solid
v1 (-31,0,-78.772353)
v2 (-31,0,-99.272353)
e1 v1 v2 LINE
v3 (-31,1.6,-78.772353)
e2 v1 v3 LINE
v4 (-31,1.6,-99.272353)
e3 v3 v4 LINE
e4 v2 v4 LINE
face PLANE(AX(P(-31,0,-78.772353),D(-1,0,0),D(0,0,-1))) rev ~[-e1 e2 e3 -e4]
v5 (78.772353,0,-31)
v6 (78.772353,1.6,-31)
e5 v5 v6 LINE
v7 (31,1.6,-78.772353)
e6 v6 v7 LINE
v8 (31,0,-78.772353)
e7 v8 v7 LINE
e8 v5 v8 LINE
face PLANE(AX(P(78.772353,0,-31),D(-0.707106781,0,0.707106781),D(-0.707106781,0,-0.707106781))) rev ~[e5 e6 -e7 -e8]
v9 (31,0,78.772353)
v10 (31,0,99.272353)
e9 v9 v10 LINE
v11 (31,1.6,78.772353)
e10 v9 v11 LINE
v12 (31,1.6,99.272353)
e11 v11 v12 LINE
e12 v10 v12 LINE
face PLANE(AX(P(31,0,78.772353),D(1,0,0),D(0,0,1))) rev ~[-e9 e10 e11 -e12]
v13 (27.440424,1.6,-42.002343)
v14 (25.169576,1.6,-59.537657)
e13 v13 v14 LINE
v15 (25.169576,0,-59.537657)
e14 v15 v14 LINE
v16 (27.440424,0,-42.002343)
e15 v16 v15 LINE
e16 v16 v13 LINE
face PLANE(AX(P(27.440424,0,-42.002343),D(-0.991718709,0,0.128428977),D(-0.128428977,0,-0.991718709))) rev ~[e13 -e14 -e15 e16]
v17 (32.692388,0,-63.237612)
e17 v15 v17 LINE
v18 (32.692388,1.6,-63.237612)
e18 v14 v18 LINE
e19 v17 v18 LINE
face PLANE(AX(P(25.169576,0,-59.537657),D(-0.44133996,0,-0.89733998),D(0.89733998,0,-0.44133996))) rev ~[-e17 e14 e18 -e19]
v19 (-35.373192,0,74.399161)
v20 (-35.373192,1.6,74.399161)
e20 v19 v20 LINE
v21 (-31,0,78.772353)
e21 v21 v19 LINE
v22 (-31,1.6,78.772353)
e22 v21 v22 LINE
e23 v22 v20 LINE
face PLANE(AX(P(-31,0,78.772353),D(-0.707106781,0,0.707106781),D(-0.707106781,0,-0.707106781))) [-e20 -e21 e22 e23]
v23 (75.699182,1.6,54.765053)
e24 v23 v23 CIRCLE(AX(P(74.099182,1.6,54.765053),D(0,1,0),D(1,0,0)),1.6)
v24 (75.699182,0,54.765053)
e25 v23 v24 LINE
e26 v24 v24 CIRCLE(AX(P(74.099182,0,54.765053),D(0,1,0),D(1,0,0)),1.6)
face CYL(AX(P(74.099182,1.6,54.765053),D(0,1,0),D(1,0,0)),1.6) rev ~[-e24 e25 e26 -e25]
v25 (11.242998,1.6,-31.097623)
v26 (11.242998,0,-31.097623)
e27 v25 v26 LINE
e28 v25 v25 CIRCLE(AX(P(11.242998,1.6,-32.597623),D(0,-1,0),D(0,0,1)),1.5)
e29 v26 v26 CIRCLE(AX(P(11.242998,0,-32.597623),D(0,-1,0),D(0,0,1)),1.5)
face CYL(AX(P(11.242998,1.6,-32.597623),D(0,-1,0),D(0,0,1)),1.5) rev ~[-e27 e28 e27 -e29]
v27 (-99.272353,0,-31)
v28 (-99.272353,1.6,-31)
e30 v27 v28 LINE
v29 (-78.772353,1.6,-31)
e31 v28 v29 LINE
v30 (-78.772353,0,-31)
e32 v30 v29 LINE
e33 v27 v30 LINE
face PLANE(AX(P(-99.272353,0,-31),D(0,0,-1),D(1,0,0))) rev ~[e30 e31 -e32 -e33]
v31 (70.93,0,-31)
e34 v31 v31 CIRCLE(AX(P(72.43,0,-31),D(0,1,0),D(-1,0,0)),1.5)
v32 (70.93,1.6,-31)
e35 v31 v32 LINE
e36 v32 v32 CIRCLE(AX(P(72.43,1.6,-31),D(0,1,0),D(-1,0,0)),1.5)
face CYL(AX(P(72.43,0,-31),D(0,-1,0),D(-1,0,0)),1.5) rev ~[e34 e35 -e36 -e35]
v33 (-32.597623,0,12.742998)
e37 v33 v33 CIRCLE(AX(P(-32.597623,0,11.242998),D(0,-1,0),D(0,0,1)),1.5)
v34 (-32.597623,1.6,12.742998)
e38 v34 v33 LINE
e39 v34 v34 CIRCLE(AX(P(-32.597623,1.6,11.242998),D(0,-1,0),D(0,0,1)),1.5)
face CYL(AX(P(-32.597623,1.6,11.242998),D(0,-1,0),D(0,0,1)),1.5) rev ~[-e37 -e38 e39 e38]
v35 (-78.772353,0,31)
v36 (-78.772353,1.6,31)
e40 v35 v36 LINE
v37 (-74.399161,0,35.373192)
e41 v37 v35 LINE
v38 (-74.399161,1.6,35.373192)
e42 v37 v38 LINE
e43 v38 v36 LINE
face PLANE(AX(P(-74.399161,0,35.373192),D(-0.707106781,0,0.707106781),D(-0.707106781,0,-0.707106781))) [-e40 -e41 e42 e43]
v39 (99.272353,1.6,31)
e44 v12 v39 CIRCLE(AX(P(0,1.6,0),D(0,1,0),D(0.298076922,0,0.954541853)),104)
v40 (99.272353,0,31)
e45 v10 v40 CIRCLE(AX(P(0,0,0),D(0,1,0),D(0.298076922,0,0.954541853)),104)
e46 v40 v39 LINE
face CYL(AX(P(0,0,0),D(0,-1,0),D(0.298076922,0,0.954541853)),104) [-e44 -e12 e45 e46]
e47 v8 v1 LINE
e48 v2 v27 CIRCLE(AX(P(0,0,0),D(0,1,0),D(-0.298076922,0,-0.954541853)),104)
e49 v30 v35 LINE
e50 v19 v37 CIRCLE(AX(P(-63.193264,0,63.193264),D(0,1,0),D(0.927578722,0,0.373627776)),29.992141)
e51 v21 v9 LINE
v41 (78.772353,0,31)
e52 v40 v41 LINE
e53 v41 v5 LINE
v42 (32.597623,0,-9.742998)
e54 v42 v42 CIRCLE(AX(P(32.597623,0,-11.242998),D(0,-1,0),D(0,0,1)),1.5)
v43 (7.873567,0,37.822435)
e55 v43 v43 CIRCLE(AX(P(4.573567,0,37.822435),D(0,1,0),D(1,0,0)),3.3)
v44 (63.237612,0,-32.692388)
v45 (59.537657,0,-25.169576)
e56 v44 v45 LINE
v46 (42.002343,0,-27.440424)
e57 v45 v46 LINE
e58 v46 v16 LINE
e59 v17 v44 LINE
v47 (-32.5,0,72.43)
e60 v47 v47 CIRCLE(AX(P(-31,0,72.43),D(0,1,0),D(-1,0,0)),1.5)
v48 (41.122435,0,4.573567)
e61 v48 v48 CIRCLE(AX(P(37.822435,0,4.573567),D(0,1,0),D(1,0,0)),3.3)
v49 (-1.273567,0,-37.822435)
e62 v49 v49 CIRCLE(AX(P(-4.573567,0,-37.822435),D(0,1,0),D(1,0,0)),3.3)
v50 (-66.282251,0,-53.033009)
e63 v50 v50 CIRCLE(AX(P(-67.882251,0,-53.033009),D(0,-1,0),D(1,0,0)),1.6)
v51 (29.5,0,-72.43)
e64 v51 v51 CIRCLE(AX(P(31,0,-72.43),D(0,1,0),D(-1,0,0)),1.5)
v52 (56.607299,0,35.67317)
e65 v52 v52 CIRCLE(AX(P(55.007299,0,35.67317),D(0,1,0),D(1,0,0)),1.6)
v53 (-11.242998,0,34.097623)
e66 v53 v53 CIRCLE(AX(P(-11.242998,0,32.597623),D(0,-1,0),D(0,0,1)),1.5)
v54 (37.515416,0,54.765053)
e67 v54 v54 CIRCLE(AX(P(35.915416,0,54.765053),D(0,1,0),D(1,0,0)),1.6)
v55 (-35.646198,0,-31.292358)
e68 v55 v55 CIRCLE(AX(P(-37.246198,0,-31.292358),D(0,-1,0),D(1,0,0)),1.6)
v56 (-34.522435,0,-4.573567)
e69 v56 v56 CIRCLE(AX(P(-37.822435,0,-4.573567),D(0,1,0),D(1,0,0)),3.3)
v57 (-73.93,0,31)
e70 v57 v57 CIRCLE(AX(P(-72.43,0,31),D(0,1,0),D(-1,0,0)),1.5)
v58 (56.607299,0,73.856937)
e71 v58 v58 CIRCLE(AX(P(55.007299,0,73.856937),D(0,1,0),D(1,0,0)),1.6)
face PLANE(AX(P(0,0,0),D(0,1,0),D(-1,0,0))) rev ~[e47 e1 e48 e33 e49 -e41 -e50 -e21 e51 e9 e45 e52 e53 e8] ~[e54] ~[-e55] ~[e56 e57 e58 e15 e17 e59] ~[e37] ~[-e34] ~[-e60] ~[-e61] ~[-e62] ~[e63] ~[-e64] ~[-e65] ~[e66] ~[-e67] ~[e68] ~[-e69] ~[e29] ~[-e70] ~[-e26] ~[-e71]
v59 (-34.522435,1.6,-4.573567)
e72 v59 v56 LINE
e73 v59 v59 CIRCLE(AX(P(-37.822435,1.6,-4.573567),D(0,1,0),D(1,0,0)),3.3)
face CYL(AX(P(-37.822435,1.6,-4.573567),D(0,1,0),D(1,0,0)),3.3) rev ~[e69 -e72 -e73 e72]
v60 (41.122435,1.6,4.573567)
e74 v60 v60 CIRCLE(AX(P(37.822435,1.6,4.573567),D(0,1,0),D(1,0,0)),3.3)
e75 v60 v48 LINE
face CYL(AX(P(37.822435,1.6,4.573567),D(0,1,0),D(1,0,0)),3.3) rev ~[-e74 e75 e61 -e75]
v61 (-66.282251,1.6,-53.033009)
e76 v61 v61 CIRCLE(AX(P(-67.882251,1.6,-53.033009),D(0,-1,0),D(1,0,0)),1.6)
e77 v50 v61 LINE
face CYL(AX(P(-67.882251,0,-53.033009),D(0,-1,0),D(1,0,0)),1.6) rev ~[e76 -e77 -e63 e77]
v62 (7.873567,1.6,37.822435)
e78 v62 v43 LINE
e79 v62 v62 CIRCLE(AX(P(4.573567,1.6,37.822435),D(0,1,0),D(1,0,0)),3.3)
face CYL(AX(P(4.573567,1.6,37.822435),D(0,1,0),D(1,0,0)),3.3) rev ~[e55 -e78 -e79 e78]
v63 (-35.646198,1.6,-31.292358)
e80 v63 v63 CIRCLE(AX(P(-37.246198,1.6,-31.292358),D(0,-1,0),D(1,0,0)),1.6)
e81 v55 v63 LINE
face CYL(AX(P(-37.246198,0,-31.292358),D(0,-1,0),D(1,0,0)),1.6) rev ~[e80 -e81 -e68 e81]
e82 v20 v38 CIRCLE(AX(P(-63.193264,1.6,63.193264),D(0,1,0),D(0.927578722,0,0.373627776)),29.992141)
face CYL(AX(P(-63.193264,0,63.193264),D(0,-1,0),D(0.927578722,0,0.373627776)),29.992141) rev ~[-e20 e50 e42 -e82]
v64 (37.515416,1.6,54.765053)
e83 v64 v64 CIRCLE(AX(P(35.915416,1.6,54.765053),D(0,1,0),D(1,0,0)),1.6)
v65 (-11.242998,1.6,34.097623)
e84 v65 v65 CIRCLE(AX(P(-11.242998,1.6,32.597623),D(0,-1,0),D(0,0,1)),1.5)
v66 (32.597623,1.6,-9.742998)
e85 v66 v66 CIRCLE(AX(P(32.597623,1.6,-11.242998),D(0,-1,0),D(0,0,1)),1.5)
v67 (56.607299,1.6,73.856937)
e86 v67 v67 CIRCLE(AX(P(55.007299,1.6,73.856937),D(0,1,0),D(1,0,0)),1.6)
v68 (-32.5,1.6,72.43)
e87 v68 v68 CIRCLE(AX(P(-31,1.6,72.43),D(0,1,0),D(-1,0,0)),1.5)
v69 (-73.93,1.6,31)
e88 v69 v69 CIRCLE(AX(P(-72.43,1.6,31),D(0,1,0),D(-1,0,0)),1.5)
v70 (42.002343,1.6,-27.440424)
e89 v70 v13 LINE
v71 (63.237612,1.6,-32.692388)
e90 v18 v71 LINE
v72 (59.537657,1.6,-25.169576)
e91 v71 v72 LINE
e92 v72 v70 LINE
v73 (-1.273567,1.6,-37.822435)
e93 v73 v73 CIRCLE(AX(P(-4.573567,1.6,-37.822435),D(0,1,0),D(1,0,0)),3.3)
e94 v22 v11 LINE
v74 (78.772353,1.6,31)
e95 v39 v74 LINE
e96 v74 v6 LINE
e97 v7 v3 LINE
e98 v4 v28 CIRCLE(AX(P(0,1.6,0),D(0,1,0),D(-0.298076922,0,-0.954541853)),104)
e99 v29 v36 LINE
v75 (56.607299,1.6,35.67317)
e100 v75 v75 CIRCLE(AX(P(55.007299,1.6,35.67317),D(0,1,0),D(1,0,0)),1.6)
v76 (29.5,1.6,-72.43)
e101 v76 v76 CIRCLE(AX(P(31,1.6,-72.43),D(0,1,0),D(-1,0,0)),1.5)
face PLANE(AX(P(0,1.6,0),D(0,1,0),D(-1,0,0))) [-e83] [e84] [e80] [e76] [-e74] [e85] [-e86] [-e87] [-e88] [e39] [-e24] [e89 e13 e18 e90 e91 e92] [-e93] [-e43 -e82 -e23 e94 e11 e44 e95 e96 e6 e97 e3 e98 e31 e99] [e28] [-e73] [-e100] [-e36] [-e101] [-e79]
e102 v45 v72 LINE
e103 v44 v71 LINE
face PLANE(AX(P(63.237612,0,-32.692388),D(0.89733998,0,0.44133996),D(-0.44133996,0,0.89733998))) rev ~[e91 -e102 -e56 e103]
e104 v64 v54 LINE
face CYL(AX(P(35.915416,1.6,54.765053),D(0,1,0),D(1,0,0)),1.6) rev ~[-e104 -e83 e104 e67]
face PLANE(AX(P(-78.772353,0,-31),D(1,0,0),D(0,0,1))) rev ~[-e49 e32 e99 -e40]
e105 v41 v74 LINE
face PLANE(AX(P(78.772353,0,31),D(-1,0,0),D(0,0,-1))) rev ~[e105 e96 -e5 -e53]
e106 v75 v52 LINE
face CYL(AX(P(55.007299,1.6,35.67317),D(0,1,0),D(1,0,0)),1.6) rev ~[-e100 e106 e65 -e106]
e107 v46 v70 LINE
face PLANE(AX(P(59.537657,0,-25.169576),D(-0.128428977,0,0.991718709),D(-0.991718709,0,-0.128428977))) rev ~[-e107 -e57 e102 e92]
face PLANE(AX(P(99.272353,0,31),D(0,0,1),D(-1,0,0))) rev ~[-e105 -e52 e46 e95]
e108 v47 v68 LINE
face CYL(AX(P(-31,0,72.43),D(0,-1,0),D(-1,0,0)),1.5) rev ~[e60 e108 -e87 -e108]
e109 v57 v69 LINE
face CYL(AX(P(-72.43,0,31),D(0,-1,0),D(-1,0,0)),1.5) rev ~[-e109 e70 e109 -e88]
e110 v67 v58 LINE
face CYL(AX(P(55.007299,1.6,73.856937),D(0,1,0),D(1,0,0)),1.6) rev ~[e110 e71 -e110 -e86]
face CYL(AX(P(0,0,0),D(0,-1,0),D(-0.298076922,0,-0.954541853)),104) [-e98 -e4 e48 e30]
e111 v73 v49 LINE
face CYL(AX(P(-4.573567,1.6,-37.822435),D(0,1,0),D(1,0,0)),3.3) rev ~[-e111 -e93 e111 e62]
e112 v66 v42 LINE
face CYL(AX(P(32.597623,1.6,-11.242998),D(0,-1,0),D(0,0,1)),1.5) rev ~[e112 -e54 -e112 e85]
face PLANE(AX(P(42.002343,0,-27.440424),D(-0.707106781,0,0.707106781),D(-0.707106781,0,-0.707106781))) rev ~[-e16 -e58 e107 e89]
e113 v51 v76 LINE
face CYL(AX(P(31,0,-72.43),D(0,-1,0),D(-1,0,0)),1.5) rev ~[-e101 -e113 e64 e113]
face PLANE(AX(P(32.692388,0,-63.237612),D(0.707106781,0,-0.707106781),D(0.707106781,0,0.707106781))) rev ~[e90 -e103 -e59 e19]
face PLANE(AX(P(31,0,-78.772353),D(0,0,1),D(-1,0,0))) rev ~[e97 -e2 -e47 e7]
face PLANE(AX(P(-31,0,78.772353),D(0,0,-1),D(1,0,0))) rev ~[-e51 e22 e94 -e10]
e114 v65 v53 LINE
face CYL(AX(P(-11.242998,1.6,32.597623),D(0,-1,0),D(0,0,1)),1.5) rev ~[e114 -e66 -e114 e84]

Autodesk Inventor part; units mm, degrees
ref_plane "YZ Plane" through (0, 0, 0) normal (1, 0, 0) x (0, 1, 0)
ref_plane "XZ Plane" through (0, 0, 0) normal (0, 1, 0) x (-1, 0, 0)
ref_plane "XY Plane" through (0, 0, 0) normal (0, 0, 1) x (1, 0, 0)
sketch "Эскиз1" plane through (0, 0, 0) normal (0, 1, 0) x (-1, 0, 0)
  line L0 (-42.002343, -27.440424) -> (-27.440424, -42.002343)
  line L1 (-27.440424, -42.002343) -> (-25.169576, -59.537657)
  line L2 (-25.169576, -59.537657) -> (-32.692388, -63.237612)
  line L3 (-32.692388, -63.237612) -> (-63.237612, -32.692388)
  line L4 (-63.237612, -32.692388) -> (-59.537657, -25.169576)
  line L5 (-59.537657, -25.169576) -> (-42.002343, -27.440424)
  circle A0 centre (-72.43, 16) radius 3.3 construction
  circle A1 centre (44.87, -82.901522) radius 3.3 construction
  circle A2 centre (42.22, 16) radius 3.3
  circle A3 centre (-44.87, 82.901522) radius 3.3 construction
  circle A4 centre (-42.22, 16) radius 3.3 construction
  circle A5 centre (-82.901522, 44.87) radius 3.3 construction
  circle A6 centre (-16, 42.22) radius 3.3 construction
  circle A7 centre (72.43, -16) radius 3.3 construction
  circle A8 centre (16, -72.43) radius 3.3 construction
  circle A9 centre (-16, -72.43) radius 3.3 construction
  circle A10 centre (-42.22, -16) radius 3.3 construction
  circle A11 centre (16, -42.22) radius 3.3 construction
  circle A12 centre (16, 42.22) radius 3.3
  circle A13 centre (16, 72.43) radius 3.3 construction
  circle A14 centre (42.22, -16) radius 3.3 construction
  circle A15 centre (72.43, 16) radius 3.3 construction
  circle A16 centre (-16, 72.43) radius 3.3 construction
  circle A17 centre (82.901522, -44.87) radius 3.3 construction
  circle A18 centre (-16, -42.22) radius 3.3 construction
  circle A19 centre (-72.43, -16) radius 3.3 construction
  line L6 (31, 78.772353) -> (-31, 78.772353)
  line L7 (-31, 78.772353) -> (-31, 99.272353)
  arc A20 (-31, 99.272353) -> (-99.272353, 31) centre (0, 0) ccw
  line L8 (-99.272353, 31) -> (-78.772353, 31)
  line L9 (-78.772353, 31) -> (-78.772353, -31)
  line L10 (-78.772353, -31) -> (-99.272353, -31)
  arc A21 (-99.272353, -31) -> (-98.086264, -34.57) centre (0, 0) ccw
  arc A22 (-34.57, -98.086264) -> (-98.086264, -34.57) centre (-109.02125, -109.02125) ccw
  arc A23 (-34.57, -98.086264) -> (-31, -99.272353) centre (0, 0) ccw
  line L11 (-31, -99.272353) -> (-31, -78.772353)
  line L12 (-31, -78.772353) -> (31, -78.772353)
  line L13 (31, -78.772353) -> (31, -99.272353)
  arc A24 (31, -99.272353) -> (99.272353, -31) centre (0, 0) ccw
  line L14 (99.272353, -31) -> (78.772353, -31)
  line L15 (78.772353, -31) -> (78.772353, 31)
  line L16 (78.772353, 31) -> (99.272353, 31)
  arc A25 (99.272353, 31) -> (98.086264, 34.57) centre (0, 0) ccw
  arc A26 (34.57, 98.086264) -> (98.086264, 34.57) centre (109.02125, 109.02125) ccw
  arc A27 (34.57, 98.086264) -> (31, 99.272353) centre (0, 0) ccw
  line L17 (31, 99.272353) -> (31, 78.772353)
  circle A28 centre (31, 72.43) radius 1.5
  circle A29 centre (72.43, 31) radius 1.5
  circle A30 centre (0, 0) radius 20
  circle A31 centre (-72.43, -31) radius 1.5
  circle A32 centre (-31, -72.43) radius 1.5
  line L18 (-55.861436, 32.526912) -> (-79.195959, 55.861436)
  line L19 (-79.195959, 55.861436) -> (-55.861436, 79.195959)
  line L20 (-55.861436, 79.195959) -> (-32.526912, 55.861436)
  line L21 (-32.526912, 55.861436) -> (-55.861436, 32.526912)
  line L22 (48.313848, -22.45283) -> (80.459207, -54.598189)
  line L23 (80.459207, -54.598189) -> (54.598189, -80.459207)
  line L24 (54.598189, -80.459207) -> (22.45283, -48.313848)
  line L25 (22.45283, -48.313848) -> (48.313848, -22.45283)
  line L26 (31, 78.772353) -> (78.772353, 31)
  circle A33 centre (31, 72.43) radius 3.5 construction
  circle A34 centre (72.43, 31) radius 1.5 construction
  circle A35 centre (72.43, 31) radius 3.5 construction
  arc A36 (35.373192, 74.399161) -> (74.399161, 35.373192) centre (63.193264, 63.193264) ccw
  line L27 (-47.729708, -10.253048) -> (10.253048, 47.729708)
  line L28 (10.253048, 47.729708) -> (47.729708, 10.253048)
  line L29 (47.729708, 10.253048) -> (-10.253048, -47.729708)
  line L30 (-10.253048, -47.729708) -> (-47.729708, -10.253048)
  line L31 (-32.526912, 55.861436) -> (-55.861436, 32.526912) construction
  line L32 (-47.729708, -10.253048) -> (47.729708, 10.253048) construction
  line L33 (-78.772353, -31) -> (-31, -78.772353)
  dimension "d0" = 7
  dimension "d1" = 7
  dimension "d2" = 82
  dimension "d3" = 53
extrude "Выдавливание1" add sketch "Эскиз1" along normal blind 1.6 contours A2 L28 | L28 A12 | L26 A36 L15 L14 A24 L13 L12 L33 L9 L8 A20 L7 L6 | L18 L19 L20 L21 | L22 L23 L24 L25 picked at (43.146155, 15.474263) picked at (17.150343, 42.083412)
sketch "Эскиз2" plane through (0, 0, 0) normal (0, 1, 0) x (1, 0, 0)
  circle A0 centre (26.769578, -48.318655) radius 1.397
  circle A1 centre (47.603772, -27.484461) radius 1.397
  line L0 (47.603772, -27.484461) -> (26.769578, -48.318655) construction
  line L1 (22.45283, -48.313848) -> (24.613608, -50.474625) construction
  line L2 (26.769578, -48.318655) -> (24.613608, -50.474625) construction
  line L3 (-47.729708, -10.253048) -> (10.253048, 47.729708)
  line L4 (47.729708, 10.253048) -> (-10.253048, -47.729708)
  point P0 (-22.45283, 48.313848)
  point P1 (-79.195959, 55.861436)
  point P2 (79.195959, -55.861436)
  dimension "d6" = 3.0558
  dimension "d8" = 29.464
  dimension "d9" = 2.794
sketch "Эскиз4" plane through (0, 1.6, 0) normal (0, 1, 0) x (1, 0, 0)
  arc A0 (75.513396, -56.886374) -> (75.513396, -52.643733) centre (73.392076, -54.765053) ccw
  line L0 (75.513396, -52.643733) -> (57.12862, -34.258957)
  arc A1 (57.12862, -34.258957) -> (52.885979, -34.258957) centre (55.007299, -36.380277) ccw
  line L1 (52.885979, -34.258957) -> (34.501203, -52.643733)
  arc A2 (34.501203, -52.643733) -> (34.501203, -56.886374) centre (36.622523, -54.765053) ccw
  line L2 (34.501203, -56.886374) -> (52.885979, -75.27115)
  arc A3 (52.885979, -75.27115) -> (57.12862, -75.27115) centre (55.007299, -73.14983) ccw
  line L3 (57.12862, -75.27115) -> (75.513396, -56.886374)
  circle A4 centre (62.785474, -48.754646) radius 0.5
  circle A5 centre (55.007299, -73.856937) radius 1.6
  circle A6 centre (74.099182, -54.765053) radius 1.6
  circle A7 centre (55.007299, -35.67317) radius 1.6
  circle A8 centre (61.017707, -39.915811) radius 0.5
  circle A9 centre (55.714406, -41.683578) radius 0.5
  circle A10 centre (57.482173, -43.451345) radius 0.5
  circle A11 centre (59.24994, -45.219112) radius 0.5
  circle A12 centre (61.017707, -46.986879) radius 0.5
  circle A13 centre (43.693591, -64.310995) radius 0.5
  circle A14 centre (41.925824, -62.543228) radius 0.5
  circle A15 centre (62.785474, -41.683578) radius 0.5
  circle A16 centre (59.24994, -38.148044) radius 0.5
  circle A17 centre (53.946639, -39.915811) radius 0.5
  circle A18 centre (35.915416, -54.765053) radius 1.6
  circle A19 centre (40.158057, -60.775461) radius 0.5
  circle A20 centre (38.39029, -59.007694) radius 0.5
  circle A21 centre (64.553241, -50.522413) radius 0.5
  circle A22 centre (66.321008, -45.219112) radius 0.5
  circle A23 centre (64.553241, -43.451345) radius 0.5
  circle A24 centre (68.088775, -46.986879) radius 0.5
  circle A25 centre (69.856542, -48.754646) radius 0.5
  circle A26 centre (71.624309, -50.522413) radius 0.5
  line L4 (47.729708, 10.253048) -> (-10.253048, -47.729708)
  line L5 (18.73833, -18.73833) -> (73.539105, -73.539105) construction
  arc A27 (31, -99.272353) -> (99.272353, -31) centre (0, 0) ccw
  line L6 (-31, -78.772353) -> (31, -78.772353)
  line L7 (78.772353, -31) -> (31, -78.772353) construction
  point P0 (55.007299, -54.765053)
  point P1 (54.886176, -54.886176)
extrude "Выдавливание4" cut sketch "Эскиз4" against normal through all contours A5 | A6 | A7 | A18
sketch "Эскиз5" plane through (0, 0, 0) normal (0, -1, 0) x (1, 0, 0)
  circle A0 centre (-37.246198, -31.292358) radius 1.6
  circle A1 centre (-67.882251, -53.033009) radius 1.6
  arc A2 (99.272353, 31) -> (31, 99.272353) centre (0, 0) ccw
extrude "Выдавливание5" cut sketch "Эскиз5" against normal through all
sketch "Эскиз6" plane through (0, 1.6, 0) normal (0, 1, 0) x (1, 0, 0)
  circle A0 centre (49.151483, 117.512898) radius 1.65
  circle A1 centre (49.151483, 117.512898) radius 3.35
  circle A2 centre (3.90139, 156.848367) radius 1.65
  circle A3 centre (79.999989, 152.999936) radius 1.65
  circle A4 centre (34.74993, 192.33537) radius 1.65
  circle A5 centre (41.950689, 154.924131) radius 41.494038
  line L0 (45.976694, 118.582111) -> (51.702547, 119.684205)
  arc A6 (39.303109, 113.514645) -> (45.976694, 118.582111) centre (26.737362, 136.991182) ccw
  arc A7 (51.702547, 119.684205) -> (59.780333, 117.456035) centre (62.733836, 143.919668) ccw
  arc A8 (78.499345, 155.995027) -> (82.588741, 163.308869) centre (57.591924, 172.485191) ccw
  circle A9 centre (79.999989, 152.999936) radius 3.35
  arc A10 (81.535526, 142.482434) -> (78.204844, 150.171517) centre (55.740492, 135.874711) ccw
  arc A11 (5.402031, 153.853275) -> (1.312636, 146.539393) centre (26.309482, 137.363149) ccw
  circle A12 centre (3.90139, 156.848367) radius 3.35
  arc A13 (2.365865, 167.365871) -> (5.696538, 159.676785) centre (28.160906, 173.973566) ccw
  arc A14 (32.198864, 190.164066) -> (24.121078, 192.392253) centre (21.16753, 165.928649) ccw
  circle A15 centre (34.74993, 192.33537) radius 3.35
  arc A16 (44.598268, 196.333616) -> (37.924718, 191.266155) centre (57.164078, 172.857113) ccw
  line L1 (39.303109, 113.514645) -> (59.780333, 117.456035) construction
  line L2 (-47.022601, -10.253048) -> (10.253048, 47.022601) construction
  line L3 (2.365865, 167.365871) -> (59.780333, 117.456035) construction
  line L4 (24.121036, 192.392233) -> (81.535512, 142.48239) construction
  line L5 (1.312636, 146.539393) -> (44.598268, 196.333616) construction
  line L6 (82.588741, 163.308869) -> (39.303109, 113.514645) construction
  circle A17 centre (41.950689, 154.924131) radius 38.097924 construction
  line L7 (45.976694, 118.582111) -> (46.911064, 113.727652) construction
  line L8 (78.204844, 150.171517) -> (78.499345, 155.995027) construction
  line L9 (41.950689, 154.924131) -> (79.999989, 152.999936) construction
  line L10 (41.950689, 154.924131) -> (34.74993, 192.33537) construction
  line L11 (41.950689, 154.924131) -> (3.90139, 156.848367) construction
  line L12 (5.696538, 159.676785) -> (5.402031, 153.853275) construction
  line L13 (32.198864, 190.164066) -> (37.924718, 191.266155) construction
  line L14 (41.950689, 154.924131) -> (49.151483, 117.512898) construction
  circle A18 centre (-37.822435, 4.573567) radius 3.3
  circle A19 centre (-4.573567, 37.822435) radius 3.3
  circle A20 centre (4.573567, -37.822435) radius 3.3
  circle A21 centre (37.822435, -4.573567) radius 3.3
  circle A22 centre (16, -49.72) radius 3.3
  line L15 (-37.822435, 4.573567) -> (-4.573567, 37.822435) construction
  line L16 (4.573567, -37.822435) -> (37.822435, -4.573567) construction
  line L17 (-21.198001, 21.198001) -> (21.198001, -21.198001) construction
  line L18 (-4.573567, 37.822435) -> (37.822435, -4.573567) construction
  point P0 (-47.616756, 71.930474)
  point P1 (-60.382397, 55.652797)
  point P2 (-60.382397, 22.39343)
  point P3 (-47.616756, 6.115753)
  point P4 (2.783098, 6.115753)
  point P5 (15.548739, 22.39343)
  point P6 (15.244077, 55.858669)
  point P7 (2.910415, 71.585522)
  point P8 (0, 0)
  point P9 (-47.616756, 71.930474)
  point P10 (-60.382397, 55.652797)
  point P11 (-60.382397, 22.39343)
  point P12 (-47.616756, 6.115753)
  point P13 (2.783098, 6.115753)
  point P14 (15.548739, 22.39343)
  point P15 (15.244077, 55.858669)
  point P16 (2.910415, 71.585522)
  point P17 (0, 0)
  dimension "d45" = 82.98808
  dimension "d43" = 3.3
  dimension "d44" = 6.7
  dimension "d46" = 26.62791
  dimension "d47" = 20.47722
  dimension "d48" = 3.71477
  dimension "d49" = 33.16031
  dimension "d50" = 50.33796
  dimension "d51" = 16.58016
  dimension "d52" = 25.16898
  dimension "d53" = 10.42652
  dimension "d54" = 10.42652
  dimension "d55" = 10.42652
  dimension "d56" = 10.42652
  dimension "d57" = 10.42652
  dimension "d58" = 10.42652
  dimension "d59" = 59.957
  dimension "d60" = 47.021
extrude "Выдавливание6" cut sketch "Эскиз6" against normal blind 10 contours A18 | A19 | A20 | A21
sketch "Эскиз7" plane through (0, 1.6, 0) normal (0, 1, 0) x (1, 0, 0)
  line L0 (-38.254477, -11.950105) -> (-11.950105, -38.254477)
  line L1 (-11.950105, -38.254477) -> (38.254477, 11.950105)
  line L2 (38.254477, 11.950105) -> (11.950105, 38.254477)
  line L3 (11.950105, 38.254477) -> (-38.254477, -11.950105)
  line L4 (-38.254477, -11.950105) -> (38.254477, 11.950105) construction
  line L5 (-11.950105, -38.254477) -> (11.950105, 38.254477) construction
  line L6 (47.022601, 10.253048) -> (-10.253048, -47.022601) construction
  line L7 (-47.729708, -10.253048) -> (10.253048, 47.729708)
  line L8 (-10.253048, -47.729708) -> (-47.729708, -10.253048)
  line L9 (10.253048, 47.729708) -> (47.729708, 10.253048)
  line L10 (47.729708, 10.253048) -> (-10.253048, -47.729708)
  line L11 (-38.254477, -11.950105) -> (-11.950105, -38.254477)
  line L12 (-11.950105, -38.254477) -> (38.254477, 11.950105)
  line L13 (38.254477, 11.950105) -> (11.950105, 38.254477)
  line L14 (11.950105, 38.254477) -> (-38.254477, -11.950105)
  line L15 (-38.254477, -11.950105) -> (38.254477, 11.950105) construction
  line L16 (-11.950105, -38.254477) -> (11.950105, 38.254477) construction
  line L17 (47.022601, 10.253048) -> (-10.253048, -47.022601) construction
  line L18 (37.54737, 11.950105) -> (11.950105, 37.54737)
  line L19 (11.950105, 37.54737) -> (-37.54737, -11.950105)
  line L20 (-37.54737, -11.950105) -> (-11.950105, -37.54737)
  line L21 (-11.950105, -37.54737) -> (37.54737, 11.950105)
  line L22 (37.54737, 11.950105) -> (-37.54737, -11.950105) construction
  line L23 (32.597623, 11.242998) -> (-11.242998, -32.597623)
  line L24 (0, 0) -> (31.732181, -31.732181) construction
  circle A0 centre (32.597623, 11.242998) radius 1.5
  line L25 (0, 0) -> (31.732181, 31.732181) construction
  line L26 (0, 0) -> (-9.9, 29) construction
  circle A1 centre (11.242998, 32.597623) radius 1.5
  circle A2 centre (-11.242998, -32.597623) radius 1.5
  circle A3 centre (-32.597623, -11.242998) radius 1.5
  point P0 (0, 0)
  point P1 (0, 0)
  point P2 (10.677312, -10.677312)
  point P3 (-4.979708, 4.979708)
  point P4 (0, 0)
  dimension "d63" = 37.2
  dimension "d64" = 71
  dimension "d67" = 37.2
  dimension "d68" = 71
  dimension "d69" = 36.2
  dimension "d70" = 70
  dimension "d71" = 4
  dimension "d72" = 3
  dimension "d73" = 3
  dimension "d74" = 3
  dimension "d75" = 4
extrude "Выдавливание8" add sketch "Эскиз7" against normal up to surface (1.6 mm away) contours L3 L2 L1 L0 | L7 L9 L10 L8 | L21 L20 L19 L18 | A0 | A1 | A2 | A3
hole "Отверстие1" at (-32.597623, 1.6, 11.242998) at (11.242998, 1.6, -32.597623) at (32.597623, 1.6, -11.242998) at (-11.242998, 1.6, 32.597623) direction (0, -1, 0) diameter 3 end through all
sketch "Эскиз8" plane through (0, 1.6, 0) normal (0, 1, 0) x (1, 0, 0)
  circle A0 centre (32.597623, 11.242998) radius 1.5
  circle A1 centre (-32.597623, -11.242998) radius 1.5
  circle A2 centre (11.242998, 32.597623) radius 1.5
  circle A3 centre (-11.242998, -32.597623) radius 1.5
  circle A4 centre (37.822435, -4.573567) radius 3.3
  circle A5 centre (-4.573567, 37.822435) radius 3.3
  circle A6 centre (4.573567, -37.822435) radius 3.3
  circle A7 centre (-37.822435, 4.573567) radius 3.3
  circle A8 centre (-37.246198, 31.292358) radius 1.6
  circle A9 centre (-67.882251, 53.033009) radius 1.6
  circle A10 centre (55.007299, -73.856937) radius 1.6
  circle A11 centre (74.099182, -54.765053) radius 1.6
  circle A12 centre (35.915416, -54.765053) radius 1.6
  circle A13 centre (55.007299, -35.67317) radius 1.6
  arc A14 (-31, 99.272353) -> (-99.272353, 31) centre (0, 0) ccw
  line L0 (-99.272353, 31) -> (-78.772353, 31)
  line L1 (-78.772353, 31) -> (-78.772353, -31)
  line L2 (-78.772353, -31) -> (-74.399161, -35.373192)
  arc A15 (-35.373192, -74.399161) -> (-74.399161, -35.373192) centre (-63.193264, -63.193264) ccw
  line L3 (-35.373192, -74.399161) -> (-31, -78.772353)
  line L4 (-31, -78.772353) -> (31, -78.772353)
  line L5 (31, -78.772353) -> (31, -99.272353)
  arc A16 (31, -99.272353) -> (99.272353, -31) centre (0, 0) ccw
  line L6 (99.272353, -31) -> (78.772353, -31)
  line L7 (78.772353, -31) -> (78.772353, 31)
  line L8 (78.772353, 31) -> (31, 78.772353)
  line L9 (31, 78.772353) -> (-31, 78.772353)
  line L10 (-31, 78.772353) -> (-31, 99.272353)
  circle A17 centre (31, 72.43) radius 1.5
  circle A18 centre (-72.43, -31) radius 1.5
  line L11 (42.002343, 27.440424) -> (27.440424, 42.002343)
  line L12 (27.440424, 42.002343) -> (25.169576, 59.537657)
  line L13 (25.169576, 59.537657) -> (32.692388, 63.237612)
  line L14 (32.692388, 63.237612) -> (63.237612, 32.692388)
  line L15 (63.237612, 32.692388) -> (59.537657, 25.169576)
  line L16 (59.537657, 25.169576) -> (42.002343, 27.440424)
  circle A19 centre (-31, -72.43) radius 1.5
  circle A20 centre (72.43, 31) radius 1.5
equation "\"d53\" = d58"
equation "\"d54\" = d58"
equation "\"d55\" = d58"
equation "\"d56\" = d58"
equation "\"d57\" = d58"
properties part number "Board1.2"
